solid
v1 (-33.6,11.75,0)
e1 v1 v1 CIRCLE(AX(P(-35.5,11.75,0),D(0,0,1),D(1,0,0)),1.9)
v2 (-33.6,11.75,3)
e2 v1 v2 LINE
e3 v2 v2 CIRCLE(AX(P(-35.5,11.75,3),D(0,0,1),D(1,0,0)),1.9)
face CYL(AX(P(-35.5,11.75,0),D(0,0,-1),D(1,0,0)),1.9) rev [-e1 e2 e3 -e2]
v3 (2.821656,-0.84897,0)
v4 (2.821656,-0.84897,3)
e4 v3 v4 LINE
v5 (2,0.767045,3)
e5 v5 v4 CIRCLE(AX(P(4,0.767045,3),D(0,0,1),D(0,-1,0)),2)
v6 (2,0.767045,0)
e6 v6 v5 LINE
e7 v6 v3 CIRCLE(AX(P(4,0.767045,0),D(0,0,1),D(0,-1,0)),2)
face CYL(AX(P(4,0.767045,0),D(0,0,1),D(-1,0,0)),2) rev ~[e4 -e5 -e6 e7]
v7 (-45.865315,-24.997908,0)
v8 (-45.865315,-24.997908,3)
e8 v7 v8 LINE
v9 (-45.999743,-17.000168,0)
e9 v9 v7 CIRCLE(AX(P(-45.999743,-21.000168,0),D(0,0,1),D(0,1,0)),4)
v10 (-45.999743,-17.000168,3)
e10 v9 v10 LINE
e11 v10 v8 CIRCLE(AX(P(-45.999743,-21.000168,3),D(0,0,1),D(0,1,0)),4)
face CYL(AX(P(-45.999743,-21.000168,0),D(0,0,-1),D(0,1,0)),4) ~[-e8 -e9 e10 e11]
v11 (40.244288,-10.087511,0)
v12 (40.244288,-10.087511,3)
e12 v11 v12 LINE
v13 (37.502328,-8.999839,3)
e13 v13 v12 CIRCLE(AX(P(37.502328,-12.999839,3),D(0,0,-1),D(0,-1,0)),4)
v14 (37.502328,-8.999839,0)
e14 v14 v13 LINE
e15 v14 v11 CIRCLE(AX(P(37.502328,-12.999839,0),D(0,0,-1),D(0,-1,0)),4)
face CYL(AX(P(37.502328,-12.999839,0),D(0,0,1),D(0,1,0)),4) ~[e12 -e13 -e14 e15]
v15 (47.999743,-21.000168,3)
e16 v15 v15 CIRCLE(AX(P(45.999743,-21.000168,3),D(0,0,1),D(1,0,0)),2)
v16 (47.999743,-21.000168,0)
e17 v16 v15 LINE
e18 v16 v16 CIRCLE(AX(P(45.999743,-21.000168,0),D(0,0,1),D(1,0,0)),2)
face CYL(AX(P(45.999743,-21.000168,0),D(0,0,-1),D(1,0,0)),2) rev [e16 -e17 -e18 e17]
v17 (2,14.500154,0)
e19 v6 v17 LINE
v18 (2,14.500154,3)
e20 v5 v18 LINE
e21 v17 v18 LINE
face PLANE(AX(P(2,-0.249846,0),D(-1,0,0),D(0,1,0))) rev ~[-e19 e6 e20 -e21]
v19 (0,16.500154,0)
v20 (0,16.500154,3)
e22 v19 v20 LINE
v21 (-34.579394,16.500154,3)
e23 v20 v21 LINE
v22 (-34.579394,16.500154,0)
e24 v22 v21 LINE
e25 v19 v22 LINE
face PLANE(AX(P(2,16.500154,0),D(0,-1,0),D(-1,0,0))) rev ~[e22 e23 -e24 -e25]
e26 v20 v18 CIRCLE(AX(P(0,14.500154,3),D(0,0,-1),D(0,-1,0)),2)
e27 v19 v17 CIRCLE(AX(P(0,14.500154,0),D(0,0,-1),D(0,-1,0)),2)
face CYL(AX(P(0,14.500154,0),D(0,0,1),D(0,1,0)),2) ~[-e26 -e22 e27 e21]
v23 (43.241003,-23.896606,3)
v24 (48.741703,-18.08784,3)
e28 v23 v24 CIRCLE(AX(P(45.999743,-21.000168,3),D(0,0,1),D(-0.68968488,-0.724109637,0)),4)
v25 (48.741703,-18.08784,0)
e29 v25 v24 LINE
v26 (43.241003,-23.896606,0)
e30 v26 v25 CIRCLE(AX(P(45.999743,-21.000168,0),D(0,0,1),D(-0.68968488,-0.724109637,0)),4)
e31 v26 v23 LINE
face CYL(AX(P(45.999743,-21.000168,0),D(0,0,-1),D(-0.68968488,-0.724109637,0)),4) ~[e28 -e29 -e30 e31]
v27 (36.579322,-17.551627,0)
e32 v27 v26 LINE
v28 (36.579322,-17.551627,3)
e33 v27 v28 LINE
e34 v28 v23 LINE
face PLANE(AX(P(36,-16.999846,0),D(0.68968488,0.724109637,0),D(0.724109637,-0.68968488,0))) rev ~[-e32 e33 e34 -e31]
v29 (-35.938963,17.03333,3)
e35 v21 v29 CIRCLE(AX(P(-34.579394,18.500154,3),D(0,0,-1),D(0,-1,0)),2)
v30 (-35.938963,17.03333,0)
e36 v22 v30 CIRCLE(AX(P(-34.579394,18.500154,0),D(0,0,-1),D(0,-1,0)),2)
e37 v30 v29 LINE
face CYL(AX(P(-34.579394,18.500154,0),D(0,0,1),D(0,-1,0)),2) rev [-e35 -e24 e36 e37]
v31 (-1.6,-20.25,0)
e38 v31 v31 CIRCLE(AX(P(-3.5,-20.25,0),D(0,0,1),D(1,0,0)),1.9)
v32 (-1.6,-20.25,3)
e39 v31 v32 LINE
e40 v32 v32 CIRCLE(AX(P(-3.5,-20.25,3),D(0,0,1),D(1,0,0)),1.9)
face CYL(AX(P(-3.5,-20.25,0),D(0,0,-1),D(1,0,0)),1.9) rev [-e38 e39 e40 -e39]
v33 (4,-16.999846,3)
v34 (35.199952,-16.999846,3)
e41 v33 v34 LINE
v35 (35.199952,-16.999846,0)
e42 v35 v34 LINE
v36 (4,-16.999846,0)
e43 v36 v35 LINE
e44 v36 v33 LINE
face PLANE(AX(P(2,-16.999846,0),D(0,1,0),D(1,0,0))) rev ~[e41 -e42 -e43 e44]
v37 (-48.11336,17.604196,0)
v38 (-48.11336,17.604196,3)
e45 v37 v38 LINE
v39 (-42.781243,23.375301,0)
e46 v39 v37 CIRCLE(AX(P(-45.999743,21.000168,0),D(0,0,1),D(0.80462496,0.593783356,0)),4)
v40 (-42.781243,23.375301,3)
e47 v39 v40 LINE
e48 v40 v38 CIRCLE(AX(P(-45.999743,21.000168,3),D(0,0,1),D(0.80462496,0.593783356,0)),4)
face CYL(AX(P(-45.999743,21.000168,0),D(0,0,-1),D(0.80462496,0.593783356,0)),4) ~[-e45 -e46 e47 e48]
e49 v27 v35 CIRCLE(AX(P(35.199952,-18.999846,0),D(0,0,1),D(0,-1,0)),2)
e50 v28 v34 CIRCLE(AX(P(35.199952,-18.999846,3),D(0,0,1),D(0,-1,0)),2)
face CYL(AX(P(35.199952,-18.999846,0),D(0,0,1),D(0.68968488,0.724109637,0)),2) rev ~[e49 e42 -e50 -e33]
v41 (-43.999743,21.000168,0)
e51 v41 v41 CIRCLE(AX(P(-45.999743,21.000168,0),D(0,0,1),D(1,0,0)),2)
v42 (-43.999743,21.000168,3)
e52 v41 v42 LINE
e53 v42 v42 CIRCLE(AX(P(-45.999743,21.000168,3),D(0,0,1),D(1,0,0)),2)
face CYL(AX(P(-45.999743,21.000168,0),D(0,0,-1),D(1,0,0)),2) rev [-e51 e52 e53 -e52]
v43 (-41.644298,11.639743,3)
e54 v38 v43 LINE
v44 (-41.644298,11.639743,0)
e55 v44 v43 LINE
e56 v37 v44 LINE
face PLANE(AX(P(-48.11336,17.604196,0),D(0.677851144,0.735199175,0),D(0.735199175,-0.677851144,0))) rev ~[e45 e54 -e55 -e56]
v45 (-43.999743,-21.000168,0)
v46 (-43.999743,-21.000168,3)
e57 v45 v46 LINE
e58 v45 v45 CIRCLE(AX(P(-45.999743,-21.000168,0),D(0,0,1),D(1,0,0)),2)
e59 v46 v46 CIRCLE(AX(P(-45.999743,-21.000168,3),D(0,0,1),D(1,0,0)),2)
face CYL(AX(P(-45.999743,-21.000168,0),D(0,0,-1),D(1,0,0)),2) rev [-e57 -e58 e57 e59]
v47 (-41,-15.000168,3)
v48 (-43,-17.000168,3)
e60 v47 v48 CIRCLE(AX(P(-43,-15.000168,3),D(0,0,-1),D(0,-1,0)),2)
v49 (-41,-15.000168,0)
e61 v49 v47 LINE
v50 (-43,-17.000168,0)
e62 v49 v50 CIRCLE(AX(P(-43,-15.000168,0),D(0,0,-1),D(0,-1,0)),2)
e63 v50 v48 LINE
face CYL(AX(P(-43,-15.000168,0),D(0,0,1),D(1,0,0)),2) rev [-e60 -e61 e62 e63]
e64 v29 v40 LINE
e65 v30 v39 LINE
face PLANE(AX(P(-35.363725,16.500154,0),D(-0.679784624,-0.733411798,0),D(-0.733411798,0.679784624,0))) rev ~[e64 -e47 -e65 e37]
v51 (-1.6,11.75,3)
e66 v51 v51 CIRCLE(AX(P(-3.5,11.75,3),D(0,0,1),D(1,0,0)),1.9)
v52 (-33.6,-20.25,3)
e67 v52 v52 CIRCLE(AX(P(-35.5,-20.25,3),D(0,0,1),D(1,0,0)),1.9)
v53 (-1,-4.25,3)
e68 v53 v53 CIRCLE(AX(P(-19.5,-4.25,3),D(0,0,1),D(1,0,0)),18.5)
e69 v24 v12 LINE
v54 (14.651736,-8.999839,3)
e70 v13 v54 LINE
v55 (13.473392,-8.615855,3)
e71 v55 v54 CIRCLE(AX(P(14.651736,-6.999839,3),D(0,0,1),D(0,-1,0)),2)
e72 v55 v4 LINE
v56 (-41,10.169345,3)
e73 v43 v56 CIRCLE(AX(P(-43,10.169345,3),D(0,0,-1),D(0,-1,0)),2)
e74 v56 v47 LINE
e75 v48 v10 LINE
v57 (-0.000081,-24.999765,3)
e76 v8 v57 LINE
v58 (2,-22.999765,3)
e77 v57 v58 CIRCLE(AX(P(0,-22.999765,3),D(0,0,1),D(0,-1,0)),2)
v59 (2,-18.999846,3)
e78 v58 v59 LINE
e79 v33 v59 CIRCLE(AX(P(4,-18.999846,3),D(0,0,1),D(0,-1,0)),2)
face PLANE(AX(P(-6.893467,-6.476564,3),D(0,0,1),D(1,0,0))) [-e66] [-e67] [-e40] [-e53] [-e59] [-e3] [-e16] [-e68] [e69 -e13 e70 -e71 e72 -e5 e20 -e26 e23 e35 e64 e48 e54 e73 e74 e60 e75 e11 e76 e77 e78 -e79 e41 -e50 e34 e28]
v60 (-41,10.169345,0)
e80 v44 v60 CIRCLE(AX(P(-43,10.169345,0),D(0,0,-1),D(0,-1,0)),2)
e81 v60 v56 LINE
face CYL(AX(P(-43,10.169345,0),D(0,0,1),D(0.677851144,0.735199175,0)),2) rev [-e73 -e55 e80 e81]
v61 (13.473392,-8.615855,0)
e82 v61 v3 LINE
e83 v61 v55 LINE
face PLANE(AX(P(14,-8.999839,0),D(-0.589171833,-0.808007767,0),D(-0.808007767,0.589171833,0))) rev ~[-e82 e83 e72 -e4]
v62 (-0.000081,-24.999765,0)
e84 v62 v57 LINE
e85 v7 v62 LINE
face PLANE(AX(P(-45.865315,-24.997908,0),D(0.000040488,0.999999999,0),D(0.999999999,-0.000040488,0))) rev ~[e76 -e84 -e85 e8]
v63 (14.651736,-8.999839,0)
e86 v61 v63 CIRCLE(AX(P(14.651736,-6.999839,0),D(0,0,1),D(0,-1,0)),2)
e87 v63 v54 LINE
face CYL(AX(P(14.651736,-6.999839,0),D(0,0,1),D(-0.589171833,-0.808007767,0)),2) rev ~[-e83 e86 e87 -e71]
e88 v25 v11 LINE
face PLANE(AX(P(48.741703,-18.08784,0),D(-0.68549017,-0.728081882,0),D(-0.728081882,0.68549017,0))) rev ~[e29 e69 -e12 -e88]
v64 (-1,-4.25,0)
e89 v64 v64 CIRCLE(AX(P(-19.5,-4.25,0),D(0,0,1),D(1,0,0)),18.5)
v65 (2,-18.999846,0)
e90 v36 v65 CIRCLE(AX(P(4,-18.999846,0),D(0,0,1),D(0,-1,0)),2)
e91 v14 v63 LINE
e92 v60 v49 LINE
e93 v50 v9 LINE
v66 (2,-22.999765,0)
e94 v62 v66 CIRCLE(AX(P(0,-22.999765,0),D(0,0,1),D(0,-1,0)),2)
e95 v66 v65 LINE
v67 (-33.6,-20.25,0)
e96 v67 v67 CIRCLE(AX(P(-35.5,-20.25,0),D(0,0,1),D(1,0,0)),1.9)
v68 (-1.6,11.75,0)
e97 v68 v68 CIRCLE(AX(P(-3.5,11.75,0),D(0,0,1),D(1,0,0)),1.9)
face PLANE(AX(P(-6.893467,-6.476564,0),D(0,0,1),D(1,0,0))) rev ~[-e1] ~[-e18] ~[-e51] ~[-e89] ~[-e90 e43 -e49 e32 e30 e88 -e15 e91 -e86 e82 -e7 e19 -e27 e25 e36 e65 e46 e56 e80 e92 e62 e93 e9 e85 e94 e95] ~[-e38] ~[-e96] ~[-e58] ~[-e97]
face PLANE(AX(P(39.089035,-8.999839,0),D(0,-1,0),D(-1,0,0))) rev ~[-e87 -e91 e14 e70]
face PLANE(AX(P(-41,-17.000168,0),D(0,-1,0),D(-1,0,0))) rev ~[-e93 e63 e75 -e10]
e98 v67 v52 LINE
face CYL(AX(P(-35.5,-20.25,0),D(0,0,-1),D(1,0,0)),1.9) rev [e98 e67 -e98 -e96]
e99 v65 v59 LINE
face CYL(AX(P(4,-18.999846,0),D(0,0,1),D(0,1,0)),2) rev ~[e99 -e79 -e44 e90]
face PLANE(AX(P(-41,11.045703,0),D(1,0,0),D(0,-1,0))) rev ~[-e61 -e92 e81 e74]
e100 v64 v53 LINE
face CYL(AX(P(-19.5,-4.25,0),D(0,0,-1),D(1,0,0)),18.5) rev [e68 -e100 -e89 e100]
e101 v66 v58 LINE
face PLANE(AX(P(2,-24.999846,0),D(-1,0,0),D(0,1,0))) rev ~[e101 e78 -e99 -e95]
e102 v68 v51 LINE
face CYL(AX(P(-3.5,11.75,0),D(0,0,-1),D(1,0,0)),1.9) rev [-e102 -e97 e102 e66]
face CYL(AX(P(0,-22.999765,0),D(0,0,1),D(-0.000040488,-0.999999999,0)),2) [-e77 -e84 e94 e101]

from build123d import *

# Parameters (mm, degrees)
F0_R     = 2
F0_R_2   = 1.9
F0_R_3   = 18.5
F1_DEPTH = 3
F2_R     = 2
F3_R     = 4


with BuildPart() as f1:
    # F0 (on Top) → F1 (new body)
    with BuildSketch(Plane.XY):
        with BuildLine():
            Line((2.0000000052, 16.5001536438), (-35.3637253092, 16.5001536438))
            Line((-35.3637253092, 16.5001536438), (-42.7812429201, 23.375301328))
            ThreePointArc((-42.7812429201, 23.375301328), (-48.9377019653, 23.7146468067), (-48.1133599984, 17.6041964427))
            Line((-48.1133599984, 17.6041964427), (-40.9999999948, 11.0457026558))
            Line((-40.9999999948, 11.0457026558), (-40.9999999948, -17.0001679047))
            Line((-40.9999999948, -17.0001679047), (-45.9997427603, -17.0001679047))
            ThreePointArc((-45.9997427603, -17.0001679047), (-49.9991778461, -21.0673913699), (-45.8653148176, -24.9979084075))
            Line((-45.8653148176, -24.9979084075), (2.0000000052, -24.9998463562))
            Line((2.0000000052, -24.9998463562), (2.0000000052, -16.9998463562))
            Line((2.0000000052, -16.9998463562), (14.0000000052, -16.9998463562))
            Line((14.0000000052, -16.9998463562), (36.0000000052, -16.9998463562))
            Line((36.0000000052, -16.9998463562), (43.2410032397, -23.8966064518))
            ThreePointArc((43.2410032397, -23.8966064518), (48.9041379149, -23.7505294783), (48.7417034391, -18.0878403757))
            Line((48.7417034391, -18.0878403757), (39.0890352428, -8.999838983))
            Line((39.0890352428, -8.999838983), (14.0000000052, -8.999838983))
            Line((14.0000000052, -8.999838983), (2.0000000052, -0.2498463562))
            Line((2.0000000052, -0.2498463562), (2.0000000052, 16.5001536438))
        make_face()
        with Locations((-45.9997427603, -21.0001679047)):
            Circle(F0_R, mode=Mode.SUBTRACT)
        with Locations((-35.5, -20.25)):
            Circle(F0_R_2, mode=Mode.SUBTRACT)
        with Locations((-3.5, -20.25)):
            Circle(F0_R_2, mode=Mode.SUBTRACT)
        with Locations((-19.5, -4.25)):
            Circle(F0_R_3, mode=Mode.SUBTRACT)
        with Locations((45.9997427603, -21.0001679047)):
            Circle(F0_R, mode=Mode.SUBTRACT)
        with Locations((-35.5, 11.75)):
            Circle(F0_R_2, mode=Mode.SUBTRACT)
        with Locations((-3.5, 11.75)):
            Circle(F0_R_2, mode=Mode.SUBTRACT)
        with Locations((-45.9997427603, 21.0001679047)):
            Circle(F0_R, mode=Mode.SUBTRACT)
    extrude(amount=F1_DEPTH)

    # F2
    f2_edges = [f1.edges().sort_by_distance(p)[0] for p in [
        (-41, -17.000168, 1.5),
        (-41, 11.045703, 1.5),
        (-35.363725, 16.500154, 1.5),
        (2, 16.500154, 1.5),
        (2, -16.999846, 1.5),
        (2, -0.249846, 1.5),
        (36, -16.999846, 1.5),
        (2, -24.999846, 1.5),
        (14, -8.999839, 1.5),
    ]]
    fillet(f2_edges, radius=F2_R)

    # F3
    f3_edges = [f1.edges().sort_by_distance(p)[0] for p in [
        (39.089035, -8.999839, 1.5),
    ]]
    fillet(f3_edges, radius=F3_R)


solid = f1.part
